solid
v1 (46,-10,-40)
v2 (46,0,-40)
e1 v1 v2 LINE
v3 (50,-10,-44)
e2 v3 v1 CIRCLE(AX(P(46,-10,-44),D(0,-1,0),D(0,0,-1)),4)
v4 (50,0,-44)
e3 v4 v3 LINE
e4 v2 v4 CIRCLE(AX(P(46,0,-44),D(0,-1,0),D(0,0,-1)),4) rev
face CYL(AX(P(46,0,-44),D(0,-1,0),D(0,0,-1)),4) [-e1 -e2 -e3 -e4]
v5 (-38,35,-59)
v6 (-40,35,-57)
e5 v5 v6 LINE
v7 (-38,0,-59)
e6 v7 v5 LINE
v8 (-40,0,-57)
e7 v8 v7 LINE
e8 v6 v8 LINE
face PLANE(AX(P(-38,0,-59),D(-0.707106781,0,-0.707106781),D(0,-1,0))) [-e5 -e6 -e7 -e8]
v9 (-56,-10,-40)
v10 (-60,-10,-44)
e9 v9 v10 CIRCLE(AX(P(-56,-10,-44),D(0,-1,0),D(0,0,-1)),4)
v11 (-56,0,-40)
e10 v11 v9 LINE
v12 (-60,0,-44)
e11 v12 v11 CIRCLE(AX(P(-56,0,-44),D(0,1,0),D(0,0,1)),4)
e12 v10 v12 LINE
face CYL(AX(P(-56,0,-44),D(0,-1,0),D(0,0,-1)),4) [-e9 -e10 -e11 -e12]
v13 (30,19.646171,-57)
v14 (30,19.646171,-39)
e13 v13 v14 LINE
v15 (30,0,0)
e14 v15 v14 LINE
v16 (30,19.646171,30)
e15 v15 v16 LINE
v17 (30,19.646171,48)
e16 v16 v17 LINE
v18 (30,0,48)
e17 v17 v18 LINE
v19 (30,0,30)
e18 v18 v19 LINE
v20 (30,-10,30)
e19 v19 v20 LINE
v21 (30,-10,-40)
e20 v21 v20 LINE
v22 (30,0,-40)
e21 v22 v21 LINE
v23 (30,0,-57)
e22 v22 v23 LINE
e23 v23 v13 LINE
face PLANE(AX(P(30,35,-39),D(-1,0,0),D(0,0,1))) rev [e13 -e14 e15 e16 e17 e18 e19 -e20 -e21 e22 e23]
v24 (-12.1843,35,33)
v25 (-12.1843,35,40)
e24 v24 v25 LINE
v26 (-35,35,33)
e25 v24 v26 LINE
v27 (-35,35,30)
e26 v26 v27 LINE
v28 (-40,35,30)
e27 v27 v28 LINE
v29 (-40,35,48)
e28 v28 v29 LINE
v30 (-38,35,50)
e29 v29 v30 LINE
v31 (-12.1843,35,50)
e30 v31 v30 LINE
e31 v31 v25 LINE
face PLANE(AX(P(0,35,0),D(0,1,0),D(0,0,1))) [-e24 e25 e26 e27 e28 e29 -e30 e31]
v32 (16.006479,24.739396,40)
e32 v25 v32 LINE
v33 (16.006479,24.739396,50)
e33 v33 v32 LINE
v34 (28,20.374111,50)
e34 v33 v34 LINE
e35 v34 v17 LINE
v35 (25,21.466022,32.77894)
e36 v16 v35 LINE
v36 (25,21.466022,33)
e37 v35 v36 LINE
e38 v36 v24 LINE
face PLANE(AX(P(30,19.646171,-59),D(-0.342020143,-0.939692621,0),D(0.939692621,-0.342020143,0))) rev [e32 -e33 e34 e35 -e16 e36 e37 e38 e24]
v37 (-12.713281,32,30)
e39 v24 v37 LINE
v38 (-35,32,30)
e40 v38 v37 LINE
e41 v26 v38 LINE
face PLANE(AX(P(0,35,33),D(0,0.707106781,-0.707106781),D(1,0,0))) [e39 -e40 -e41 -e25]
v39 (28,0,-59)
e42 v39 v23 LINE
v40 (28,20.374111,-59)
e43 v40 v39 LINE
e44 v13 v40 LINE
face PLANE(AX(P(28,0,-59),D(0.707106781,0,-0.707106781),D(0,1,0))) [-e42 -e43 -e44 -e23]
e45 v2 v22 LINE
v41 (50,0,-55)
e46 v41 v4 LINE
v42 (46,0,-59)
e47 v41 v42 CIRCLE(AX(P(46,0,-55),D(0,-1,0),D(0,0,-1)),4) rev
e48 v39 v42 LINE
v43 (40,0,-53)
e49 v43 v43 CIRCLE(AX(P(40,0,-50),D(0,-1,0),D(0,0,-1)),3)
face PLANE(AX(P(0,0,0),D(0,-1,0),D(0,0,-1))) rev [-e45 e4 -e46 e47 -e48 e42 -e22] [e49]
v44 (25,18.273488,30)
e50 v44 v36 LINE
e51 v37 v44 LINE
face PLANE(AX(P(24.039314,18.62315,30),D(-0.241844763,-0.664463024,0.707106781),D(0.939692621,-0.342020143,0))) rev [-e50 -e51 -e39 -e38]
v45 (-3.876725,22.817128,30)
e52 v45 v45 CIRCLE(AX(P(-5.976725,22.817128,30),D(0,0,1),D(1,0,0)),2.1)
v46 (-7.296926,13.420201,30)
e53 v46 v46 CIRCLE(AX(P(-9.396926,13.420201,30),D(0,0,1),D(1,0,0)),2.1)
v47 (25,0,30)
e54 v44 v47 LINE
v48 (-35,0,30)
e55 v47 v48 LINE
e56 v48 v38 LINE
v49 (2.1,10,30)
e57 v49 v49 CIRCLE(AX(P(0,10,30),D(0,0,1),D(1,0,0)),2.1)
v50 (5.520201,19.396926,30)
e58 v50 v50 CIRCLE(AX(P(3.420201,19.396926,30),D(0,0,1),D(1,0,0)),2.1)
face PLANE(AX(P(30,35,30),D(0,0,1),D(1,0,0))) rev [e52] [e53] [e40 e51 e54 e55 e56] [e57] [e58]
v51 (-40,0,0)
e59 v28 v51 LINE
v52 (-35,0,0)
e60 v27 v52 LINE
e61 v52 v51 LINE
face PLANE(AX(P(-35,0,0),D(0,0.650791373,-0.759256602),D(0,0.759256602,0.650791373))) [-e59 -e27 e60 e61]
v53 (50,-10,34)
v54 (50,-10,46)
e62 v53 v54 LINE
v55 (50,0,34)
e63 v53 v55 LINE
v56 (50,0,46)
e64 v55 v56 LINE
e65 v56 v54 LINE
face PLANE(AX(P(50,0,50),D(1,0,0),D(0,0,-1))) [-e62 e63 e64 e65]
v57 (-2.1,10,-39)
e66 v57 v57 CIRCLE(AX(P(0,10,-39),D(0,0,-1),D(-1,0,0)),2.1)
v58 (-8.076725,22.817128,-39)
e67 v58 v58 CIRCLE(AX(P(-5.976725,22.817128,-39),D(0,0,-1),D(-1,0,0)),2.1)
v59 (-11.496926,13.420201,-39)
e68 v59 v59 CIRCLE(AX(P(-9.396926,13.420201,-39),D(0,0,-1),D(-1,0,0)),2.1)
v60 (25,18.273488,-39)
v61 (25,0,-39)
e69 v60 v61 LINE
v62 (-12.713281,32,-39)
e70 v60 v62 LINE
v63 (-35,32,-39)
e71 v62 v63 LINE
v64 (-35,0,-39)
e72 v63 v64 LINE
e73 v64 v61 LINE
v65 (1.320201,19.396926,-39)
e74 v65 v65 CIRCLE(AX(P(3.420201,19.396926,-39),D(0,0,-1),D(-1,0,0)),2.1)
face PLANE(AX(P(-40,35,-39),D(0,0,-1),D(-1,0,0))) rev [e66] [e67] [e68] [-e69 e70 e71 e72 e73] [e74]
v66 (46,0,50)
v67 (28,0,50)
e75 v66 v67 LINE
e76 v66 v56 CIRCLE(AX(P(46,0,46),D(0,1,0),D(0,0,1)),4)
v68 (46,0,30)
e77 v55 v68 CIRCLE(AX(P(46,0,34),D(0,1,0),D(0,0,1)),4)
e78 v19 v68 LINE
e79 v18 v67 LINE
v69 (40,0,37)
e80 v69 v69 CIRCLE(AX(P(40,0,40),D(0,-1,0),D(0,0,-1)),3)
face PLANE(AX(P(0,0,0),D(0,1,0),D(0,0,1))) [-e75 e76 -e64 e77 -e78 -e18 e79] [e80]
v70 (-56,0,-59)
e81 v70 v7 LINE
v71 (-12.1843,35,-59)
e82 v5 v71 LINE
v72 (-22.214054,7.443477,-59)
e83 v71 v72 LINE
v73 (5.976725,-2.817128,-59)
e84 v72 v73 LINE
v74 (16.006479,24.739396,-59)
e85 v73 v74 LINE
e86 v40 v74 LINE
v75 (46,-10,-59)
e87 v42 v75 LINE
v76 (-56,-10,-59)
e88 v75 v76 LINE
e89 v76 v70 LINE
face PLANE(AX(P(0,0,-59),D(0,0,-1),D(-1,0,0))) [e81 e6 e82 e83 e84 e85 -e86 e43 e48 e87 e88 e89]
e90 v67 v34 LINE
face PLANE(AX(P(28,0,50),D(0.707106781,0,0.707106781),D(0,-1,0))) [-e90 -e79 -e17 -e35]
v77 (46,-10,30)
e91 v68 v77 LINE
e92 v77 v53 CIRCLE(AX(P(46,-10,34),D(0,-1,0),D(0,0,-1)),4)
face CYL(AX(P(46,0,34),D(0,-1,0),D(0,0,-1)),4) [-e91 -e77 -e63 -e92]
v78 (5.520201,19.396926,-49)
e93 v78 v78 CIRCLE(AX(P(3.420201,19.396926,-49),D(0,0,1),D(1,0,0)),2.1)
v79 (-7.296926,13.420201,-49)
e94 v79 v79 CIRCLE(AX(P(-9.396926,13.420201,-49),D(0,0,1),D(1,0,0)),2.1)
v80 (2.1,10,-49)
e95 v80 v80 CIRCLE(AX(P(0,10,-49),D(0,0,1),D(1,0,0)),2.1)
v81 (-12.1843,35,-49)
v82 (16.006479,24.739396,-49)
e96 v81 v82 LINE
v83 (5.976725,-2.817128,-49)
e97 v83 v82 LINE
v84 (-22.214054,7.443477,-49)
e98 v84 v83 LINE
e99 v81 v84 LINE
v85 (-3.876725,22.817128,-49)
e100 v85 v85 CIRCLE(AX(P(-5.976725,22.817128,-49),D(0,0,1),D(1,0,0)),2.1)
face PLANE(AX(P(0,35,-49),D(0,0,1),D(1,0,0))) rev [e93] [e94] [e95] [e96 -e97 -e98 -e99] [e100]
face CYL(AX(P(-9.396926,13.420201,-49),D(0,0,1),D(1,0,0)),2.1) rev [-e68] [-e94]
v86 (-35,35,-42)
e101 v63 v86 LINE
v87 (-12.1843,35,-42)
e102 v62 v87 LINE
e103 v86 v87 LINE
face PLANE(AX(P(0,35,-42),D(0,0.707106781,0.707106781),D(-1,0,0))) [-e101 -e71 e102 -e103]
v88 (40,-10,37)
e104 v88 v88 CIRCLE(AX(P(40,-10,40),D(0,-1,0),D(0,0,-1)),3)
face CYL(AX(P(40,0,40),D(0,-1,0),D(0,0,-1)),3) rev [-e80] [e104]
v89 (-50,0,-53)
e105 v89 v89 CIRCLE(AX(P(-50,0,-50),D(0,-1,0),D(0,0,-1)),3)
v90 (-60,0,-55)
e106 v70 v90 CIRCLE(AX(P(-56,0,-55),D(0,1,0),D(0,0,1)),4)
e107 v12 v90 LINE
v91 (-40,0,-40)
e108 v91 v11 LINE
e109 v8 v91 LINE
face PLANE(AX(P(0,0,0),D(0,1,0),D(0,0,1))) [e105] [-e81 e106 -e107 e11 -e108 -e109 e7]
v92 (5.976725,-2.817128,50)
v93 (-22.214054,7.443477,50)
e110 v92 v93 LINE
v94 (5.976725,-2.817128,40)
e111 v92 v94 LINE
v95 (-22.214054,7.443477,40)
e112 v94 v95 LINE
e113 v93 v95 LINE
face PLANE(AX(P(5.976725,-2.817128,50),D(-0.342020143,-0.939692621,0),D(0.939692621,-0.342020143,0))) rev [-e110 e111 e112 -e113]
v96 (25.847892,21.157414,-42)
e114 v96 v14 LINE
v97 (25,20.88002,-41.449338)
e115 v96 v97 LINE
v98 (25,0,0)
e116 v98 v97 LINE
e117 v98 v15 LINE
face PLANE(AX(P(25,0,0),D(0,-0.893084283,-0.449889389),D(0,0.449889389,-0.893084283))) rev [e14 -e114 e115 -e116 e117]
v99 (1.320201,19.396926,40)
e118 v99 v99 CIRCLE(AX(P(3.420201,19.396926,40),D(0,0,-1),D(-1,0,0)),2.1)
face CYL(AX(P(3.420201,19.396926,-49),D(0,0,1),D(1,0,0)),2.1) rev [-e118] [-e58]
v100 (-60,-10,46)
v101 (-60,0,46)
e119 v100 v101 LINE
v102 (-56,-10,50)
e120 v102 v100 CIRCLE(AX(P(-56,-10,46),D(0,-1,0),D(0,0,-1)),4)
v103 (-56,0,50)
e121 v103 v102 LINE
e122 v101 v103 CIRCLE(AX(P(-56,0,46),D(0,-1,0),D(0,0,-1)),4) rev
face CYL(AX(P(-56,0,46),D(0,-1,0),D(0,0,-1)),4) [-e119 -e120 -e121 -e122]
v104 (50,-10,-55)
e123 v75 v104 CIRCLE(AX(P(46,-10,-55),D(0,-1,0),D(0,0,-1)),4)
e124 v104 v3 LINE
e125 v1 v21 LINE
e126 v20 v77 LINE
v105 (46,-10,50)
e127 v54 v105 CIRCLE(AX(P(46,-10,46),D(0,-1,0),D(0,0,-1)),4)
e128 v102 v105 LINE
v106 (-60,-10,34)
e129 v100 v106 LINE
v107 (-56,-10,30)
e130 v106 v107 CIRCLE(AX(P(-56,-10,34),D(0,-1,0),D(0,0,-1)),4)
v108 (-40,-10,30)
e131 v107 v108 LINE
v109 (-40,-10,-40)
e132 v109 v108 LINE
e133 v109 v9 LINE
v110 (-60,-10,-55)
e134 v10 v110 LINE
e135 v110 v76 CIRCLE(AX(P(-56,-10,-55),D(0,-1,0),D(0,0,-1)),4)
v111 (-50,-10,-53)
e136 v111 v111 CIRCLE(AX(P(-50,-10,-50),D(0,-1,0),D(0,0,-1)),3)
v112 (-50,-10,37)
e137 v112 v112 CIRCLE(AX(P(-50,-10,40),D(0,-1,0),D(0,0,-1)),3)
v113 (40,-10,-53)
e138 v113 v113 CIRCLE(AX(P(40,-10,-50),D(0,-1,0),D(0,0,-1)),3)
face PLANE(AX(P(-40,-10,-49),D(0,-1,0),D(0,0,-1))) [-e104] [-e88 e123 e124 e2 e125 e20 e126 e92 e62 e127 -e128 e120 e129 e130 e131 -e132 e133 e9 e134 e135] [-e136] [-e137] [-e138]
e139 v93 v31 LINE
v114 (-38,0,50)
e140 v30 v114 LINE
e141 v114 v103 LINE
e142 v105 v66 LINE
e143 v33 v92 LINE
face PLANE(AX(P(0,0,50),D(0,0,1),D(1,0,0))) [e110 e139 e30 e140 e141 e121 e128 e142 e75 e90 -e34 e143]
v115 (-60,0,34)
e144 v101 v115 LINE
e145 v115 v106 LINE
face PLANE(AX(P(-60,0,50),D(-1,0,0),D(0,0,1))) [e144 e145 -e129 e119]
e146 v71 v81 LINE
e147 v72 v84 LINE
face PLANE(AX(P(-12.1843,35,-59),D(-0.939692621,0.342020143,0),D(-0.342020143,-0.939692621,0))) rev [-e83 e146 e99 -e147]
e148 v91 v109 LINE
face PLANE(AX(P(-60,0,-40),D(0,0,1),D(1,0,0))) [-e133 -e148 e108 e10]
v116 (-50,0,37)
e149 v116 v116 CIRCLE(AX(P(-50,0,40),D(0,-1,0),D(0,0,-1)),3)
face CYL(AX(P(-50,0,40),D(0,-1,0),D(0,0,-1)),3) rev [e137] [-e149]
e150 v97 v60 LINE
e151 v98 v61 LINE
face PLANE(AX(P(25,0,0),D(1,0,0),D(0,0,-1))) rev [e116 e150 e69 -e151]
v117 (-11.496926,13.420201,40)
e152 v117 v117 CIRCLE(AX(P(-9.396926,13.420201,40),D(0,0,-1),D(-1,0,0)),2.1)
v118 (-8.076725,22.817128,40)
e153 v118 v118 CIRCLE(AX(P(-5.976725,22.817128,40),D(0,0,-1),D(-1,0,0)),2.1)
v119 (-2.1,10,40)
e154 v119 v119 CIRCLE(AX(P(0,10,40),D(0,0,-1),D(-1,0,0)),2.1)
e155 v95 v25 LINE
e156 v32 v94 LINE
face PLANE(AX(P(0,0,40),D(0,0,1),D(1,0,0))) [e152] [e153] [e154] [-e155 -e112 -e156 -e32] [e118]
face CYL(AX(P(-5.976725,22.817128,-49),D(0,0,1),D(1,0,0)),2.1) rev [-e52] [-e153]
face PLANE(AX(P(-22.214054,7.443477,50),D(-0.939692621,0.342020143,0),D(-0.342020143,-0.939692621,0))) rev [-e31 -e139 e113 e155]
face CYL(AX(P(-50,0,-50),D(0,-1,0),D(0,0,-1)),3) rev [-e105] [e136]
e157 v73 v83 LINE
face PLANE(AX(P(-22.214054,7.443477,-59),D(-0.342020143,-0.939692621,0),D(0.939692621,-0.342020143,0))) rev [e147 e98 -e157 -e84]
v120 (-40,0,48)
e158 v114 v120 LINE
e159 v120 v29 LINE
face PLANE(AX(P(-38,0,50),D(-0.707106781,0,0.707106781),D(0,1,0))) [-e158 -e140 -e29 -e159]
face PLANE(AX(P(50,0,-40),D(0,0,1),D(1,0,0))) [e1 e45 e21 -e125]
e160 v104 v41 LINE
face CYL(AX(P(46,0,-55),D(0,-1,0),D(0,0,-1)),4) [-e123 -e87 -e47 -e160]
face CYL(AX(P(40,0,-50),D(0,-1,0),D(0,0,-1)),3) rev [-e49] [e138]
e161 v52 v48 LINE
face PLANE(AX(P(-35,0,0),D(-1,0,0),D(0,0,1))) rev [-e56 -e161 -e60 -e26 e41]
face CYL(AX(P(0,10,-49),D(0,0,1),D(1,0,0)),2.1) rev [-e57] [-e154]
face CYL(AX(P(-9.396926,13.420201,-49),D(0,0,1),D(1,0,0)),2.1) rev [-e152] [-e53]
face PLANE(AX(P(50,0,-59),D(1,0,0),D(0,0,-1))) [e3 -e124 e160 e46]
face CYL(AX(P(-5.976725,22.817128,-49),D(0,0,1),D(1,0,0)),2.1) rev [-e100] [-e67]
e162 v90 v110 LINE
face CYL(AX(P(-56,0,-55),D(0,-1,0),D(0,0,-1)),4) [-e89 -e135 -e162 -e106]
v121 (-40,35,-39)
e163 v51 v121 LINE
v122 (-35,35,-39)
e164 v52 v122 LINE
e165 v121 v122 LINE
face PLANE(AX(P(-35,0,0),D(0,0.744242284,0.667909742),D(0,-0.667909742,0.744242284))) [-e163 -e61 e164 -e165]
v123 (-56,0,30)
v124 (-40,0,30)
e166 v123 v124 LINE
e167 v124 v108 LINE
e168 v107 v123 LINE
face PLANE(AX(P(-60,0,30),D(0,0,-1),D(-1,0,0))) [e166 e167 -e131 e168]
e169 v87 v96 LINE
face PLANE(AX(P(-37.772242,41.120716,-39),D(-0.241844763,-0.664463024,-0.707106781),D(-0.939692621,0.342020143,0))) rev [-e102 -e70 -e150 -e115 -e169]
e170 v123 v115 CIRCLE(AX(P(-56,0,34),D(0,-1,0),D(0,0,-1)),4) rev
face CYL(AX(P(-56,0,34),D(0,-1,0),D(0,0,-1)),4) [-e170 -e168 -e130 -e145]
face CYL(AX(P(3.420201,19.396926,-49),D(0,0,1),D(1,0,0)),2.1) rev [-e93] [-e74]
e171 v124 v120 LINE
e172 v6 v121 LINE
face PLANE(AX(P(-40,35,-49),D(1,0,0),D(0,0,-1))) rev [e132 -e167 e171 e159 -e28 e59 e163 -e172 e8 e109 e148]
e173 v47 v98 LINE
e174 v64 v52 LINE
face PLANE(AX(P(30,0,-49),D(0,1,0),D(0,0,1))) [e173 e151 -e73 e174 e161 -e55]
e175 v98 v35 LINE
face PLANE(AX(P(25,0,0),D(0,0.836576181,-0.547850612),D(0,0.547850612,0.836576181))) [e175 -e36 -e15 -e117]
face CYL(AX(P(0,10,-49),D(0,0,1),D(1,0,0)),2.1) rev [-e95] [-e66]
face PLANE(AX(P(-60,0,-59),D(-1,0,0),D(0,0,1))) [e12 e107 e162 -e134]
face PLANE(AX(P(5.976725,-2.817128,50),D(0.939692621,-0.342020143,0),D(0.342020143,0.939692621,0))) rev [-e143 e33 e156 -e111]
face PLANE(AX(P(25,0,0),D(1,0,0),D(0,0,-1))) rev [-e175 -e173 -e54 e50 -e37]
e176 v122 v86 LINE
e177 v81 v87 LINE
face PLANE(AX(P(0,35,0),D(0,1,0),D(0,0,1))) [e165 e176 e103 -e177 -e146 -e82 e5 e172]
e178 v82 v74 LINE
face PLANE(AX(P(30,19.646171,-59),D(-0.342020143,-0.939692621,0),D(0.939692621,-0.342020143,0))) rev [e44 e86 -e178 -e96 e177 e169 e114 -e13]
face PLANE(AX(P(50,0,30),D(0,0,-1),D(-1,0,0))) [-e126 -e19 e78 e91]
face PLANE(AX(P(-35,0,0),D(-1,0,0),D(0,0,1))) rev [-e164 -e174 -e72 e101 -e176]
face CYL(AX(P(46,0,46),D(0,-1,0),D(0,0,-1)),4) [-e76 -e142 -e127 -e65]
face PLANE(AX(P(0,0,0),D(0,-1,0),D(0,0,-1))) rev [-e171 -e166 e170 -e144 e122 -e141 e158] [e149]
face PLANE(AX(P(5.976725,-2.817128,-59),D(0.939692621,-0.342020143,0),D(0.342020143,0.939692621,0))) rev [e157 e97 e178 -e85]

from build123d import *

# Parameters (mm, degrees)
EXTRUDE_1_DEPTH          = 35
EXTRUDE_1_2_DEPTH        = 35
CUT_EXTRUDE_1_DEPTH      = 104.662915259
CUT_EXTRUDE_1_DEPTH_BACK = 104.662915259
SKETCH_2_R               = 2.1
SKETCH_3_W               = 70
SKETCH_3_H               = 10
EXTRUDE_2_DEPTH          = 89
EXTRUDE_3_DEPTH          = 10
EXTRUDE_4_DEPTH          = 10
SKETCH_8_W               = 20
SKETCH_8_H               = 19
SKETCH_8_R               = 3
SKETCH_8_H_2             = 20
EXTRUDE_9_DEPTH          = 10
EXTRUDE_10_DEPTH         = 5
CUT_EXTRUDE_2_DEPTH      = 130.251692445
CUT_EXTRUDE_2_DEPTH_BACK = 130.251692445
EXTRUDE_12_DEPTH         = 5
FILLET_1_R               = 4
FILLET_2_R               = 4
CHAMFER_3_SIZE           = 3
CHAMFER_4_SIZE           = 2


with BuildPart() as part:
    # Эскиз1 → Бобышка-Вытянуть1 (new body)
    with BuildSketch(Plane(origin=(0, 0, 0), x_dir=(1, 0, 0), z_dir=(0, 1, 0))):
        Polygon((0, -40), (30, -40), (30, -30), (-40, -30), (-40, -40), align=None)
    extrude(amount=EXTRUDE_1_DEPTH)


with BuildPart() as body_2:
    # Эскиз1 → Extrude 1 2 (new body)
    with BuildSketch(Plane(origin=(0, 0, 0), x_dir=(1, 0, 0), z_dir=(0, 1, 0))):
        Polygon((0, 49), (30, 49), (30, 39), (-40, 39), (-40, 49), align=None)
    extrude(amount=EXTRUDE_1_2_DEPTH)


with BuildPart() as cut_extrude_1_tool:
    # Эскиз2 → Вырез-Вытянуть1 (new, two sides: drawn at the far end of the back side and taken through both)
    with BuildSketch(Plane.XY.offset(40).offset(-CUT_EXTRUDE_1_DEPTH_BACK)):
        with Locations((0, 10)):
            Circle(SKETCH_2_R)
        with Locations((-9.396926208, 13.420201433)):
            Circle(SKETCH_2_R)
        with Locations((3.420201433, 19.396926208)):
            Circle(SKETCH_2_R)
        with Locations((-5.976724775, 22.817127641)):
            Circle(SKETCH_2_R)
    extrude(amount=CUT_EXTRUDE_1_DEPTH + CUT_EXTRUDE_1_DEPTH_BACK)


with BuildPart() as part_1:
    add(part.part)

    # Вырез-Вытянуть1: cut by cut_extrude_1_tool
    add(cut_extrude_1_tool.part, mode=Mode.SUBTRACT)



with BuildPart() as body_2_1:
    add(body_2.part)

    # Вырез-Вытянуть1: cut by cut_extrude_1_tool
    add(cut_extrude_1_tool.part, mode=Mode.SUBTRACT)


with BuildPart() as part_2:
    add(part_1.part)

    add(body_2_1.part)  # Бобышка-Вытянуть2 merges body 2
    # Эскиз3 → Бобышка-Вытянуть2 (add)
    with BuildSketch(Plane.XY.offset(40)):
        with Locations((-5, -5)):
            Rectangle(SKETCH_3_W, SKETCH_3_H)
    extrude(amount=-EXTRUDE_2_DEPTH)

    # Эскиз4 → Бобышка-Вытянуть3 (add)
    with BuildSketch(Plane.XY.offset(40)):
        Polygon((5.976724775, -2.817127641), (-22.214053849, 7.443476659), (-12.184299593, 35), (-40, 35), (-40, -10), (30, -10), (30, 35), (19.741033581, 35), align=None)
    extrude(amount=EXTRUDE_3_DEPTH)

    # Эскиз5 → Бобышка-Вытянуть4 (add)
    with BuildSketch(Plane(origin=(0, 0, -49), x_dir=(-1, 0, 0), z_dir=(0, 0, -1))):
        Polygon((-30, 35), (-30, -10), (40, -10), (40, 35), (12.184299593, 35), (22.214053849, 7.443476659), (-5.976724775, -2.817127641), (-19.741033581, 35), align=None)
    extrude(amount=EXTRUDE_4_DEPTH)

    # Эскиз8 → Бобышка-Вытянуть9 (add)
    # profile 1 of 4: a face of its own
    with BuildSketch(Plane(origin=(0, -10, 0), x_dir=(-1, 0, 0), z_dir=(0, -1, 0))):
        with Locations((-40, 49.5)):
            Rectangle(SKETCH_8_W, SKETCH_8_H)
        with Locations(Location((-40, 50, 0), (0, 0, 90))):
            Circle(SKETCH_8_R, mode=Mode.SUBTRACT)
    # profile 2 of 4: a face of its own
    with BuildSketch(Plane(origin=(0, -10, 0), x_dir=(-1, 0, 0), z_dir=(0, -1, 0))):
        with Locations((-40, -40)):
            Rectangle(SKETCH_8_W, SKETCH_8_H_2)
        with Locations(Location((-40, -40, 0), (0, 0, 90))):
            Circle(SKETCH_8_R, mode=Mode.SUBTRACT)
    # profile 3 of 4: a face of its own
    with BuildSketch(Plane(origin=(0, -10, 0), x_dir=(-1, 0, 0), z_dir=(0, -1, 0))):
        with Locations((50, 49.5)):
            Rectangle(SKETCH_8_W, SKETCH_8_H)
        with Locations(Location((50, 50, 0), (0, 0, 90))):
            Circle(SKETCH_8_R, mode=Mode.SUBTRACT)
    # profile 4 of 4: a face of its own
    with BuildSketch(Plane(origin=(0, -10, 0), x_dir=(-1, 0, 0), z_dir=(0, -1, 0))):
        with Locations((50, -40)):
            Rectangle(SKETCH_8_W, SKETCH_8_H_2)
        with Locations(Location((50, -40, 0), (0, 0, 90))):
            Circle(SKETCH_8_R, mode=Mode.SUBTRACT)
    extrude(amount=-EXTRUDE_9_DEPTH)

    # Эскиз6 → Бобышка-Вытянуть10 (add)
    with BuildSketch(Plane.ZY.offset(40)):
        Polygon((-39, 0), (0, 0), (-39, 35), align=None)
        Polygon((30, 0), (30, 35), (0, 0), align=None)
    extrude(amount=-EXTRUDE_10_DEPTH)

    # Эскиз10 → Вырез-Вытянуть2 (cut, two sides: drawn at the far end of the back side and taken through both)
    with BuildSketch(Plane.XY.offset(50).offset(-CUT_EXTRUDE_2_DEPTH_BACK)):
        Polygon((30, 19.646170595), (-12.184299593, 35), (30, 35), align=None)
    extrude(amount=CUT_EXTRUDE_2_DEPTH + CUT_EXTRUDE_2_DEPTH_BACK, mode=Mode.SUBTRACT)

    # Эскиз9 → Бобышка-Вытянуть12 (add)
    with BuildSketch(Plane(origin=(30, 0, 0), x_dir=(0, 0, -1), z_dir=(1, 0, 0))):
        Polygon((39, 19.646170595), (39, 0), (0, 0), align=None)
        Polygon((0, 0), (-30, 19.646170595), (-30, 0), align=None)
    extrude(amount=-EXTRUDE_12_DEPTH)

    # Скругление1
    fillet_1_edges = [part_2.edges().sort_by_distance(p)[0] for p in [
        (50, -5, -59),
        (50, -5, 50),
        (-60, -5, -59),
        (-60, -5, 50),
    ]]
    fillet(fillet_1_edges, radius=FILLET_1_R)

    # Скругление2
    fillet_2_edges = [part_2.edges().sort_by_distance(p)[0] for p in [
        (50, -5, -40),
        (50, -5, 30),
        (-60, -5, -40),
        (-60, -5, 30),
    ]]
    fillet(fillet_2_edges, radius=FILLET_2_R)

    # Фаска3
    # the kernel refuses this chamfer: 3 mm, written as the material it takes off along each edge
    with BuildSketch(Plane(origin=(-4.469250629, 35, -39), x_dir=(0, 0.027495876610586768, -0.9996219169112968), z_dir=(-1, 0, 0))) as chamfer_3_piece_1:
        Polygon((CHAMFER_3_SIZE * 0.999621916911, CHAMFER_3_SIZE * 0.0274958766106), (-CHAMFER_3_SIZE * 0.0274958766106, CHAMFER_3_SIZE * 0.999621916911), (0, 0), align=None)
    extrude(amount=30.530749371, mode=Mode.SUBTRACT)
    with BuildSketch(Plane(origin=(-19.434074173, 37.638702152, -39), x_dir=(0.009404143659217951, 0.02583767235300856, -0.9996219169112968), z_dir=(0.9396926207859079, -0.34202014332567027, 0))) as chamfer_3_piece_2_section:
        Polygon((CHAMFER_3_SIZE * 0.999621916911, -CHAMFER_3_SIZE * 0.0274958766106), (-CHAMFER_3_SIZE * 0.0274958766106, -CHAMFER_3_SIZE * 0.999621916911), (0, 0), align=None)
    chamfer_3_piece_2 = extrude(amount=60.321691902, mode=Mode.PRIVATE)
    chamfer_3_piece_2 = split(chamfer_3_piece_2, bisect_by=Plane(origin=(25, 27.771188546, -39.985901666), z_dir=(-1, 0, 0)), keep=Keep.TOP, mode=Mode.PRIVATE)
    add(chamfer_3_piece_2, mode=Mode.SUBTRACT)
    with BuildSketch(Plane(origin=(-19.434074173, 37.638702152, -39), x_dir=(0.009404143659217951, 0.02583767235300856, -0.9996219169112968), z_dir=(0.9396926207859079, -0.34202014332567027, 0))) as chamfer_3_piece_3_section:
        Polygon((CHAMFER_3_SIZE * 0.999621916911, -CHAMFER_3_SIZE * 0.0274958766106), (-CHAMFER_3_SIZE * 0.0274958766106, -CHAMFER_3_SIZE * 0.999621916911), (0, 0), align=None)
    chamfer_3_piece_3 = extrude(amount=60.321691902, mode=Mode.PRIVATE)
    chamfer_3_piece_3 = split(chamfer_3_piece_3, bisect_by=Plane(origin=(26.25970181, 20.183987428, -40.067630782), z_dir=(0, 0.8930842834154016, 0.4498893894241103)), keep=Keep.TOP, mode=Mode.PRIVATE)
    add(chamfer_3_piece_3, mode=Mode.SUBTRACT)
    with BuildSketch(Plane(origin=(-4.469250629, 35, 30), x_dir=(0, 0.027495876610586768, 0.9996219169112968), z_dir=(-1, 0, 0))) as chamfer_3_piece_4:
        Polygon((CHAMFER_3_SIZE * 0.999621916911, -CHAMFER_3_SIZE * 0.0274958766106), (-CHAMFER_3_SIZE * 0.0274958766106, -CHAMFER_3_SIZE * 0.999621916911), (0, 0), align=None)
    extrude(amount=30.530749371, mode=Mode.SUBTRACT)
    with BuildSketch(Plane(origin=(-19.434074173, 37.638702152, 30), x_dir=(0.009404143659217682, 0.025837672353007816, 0.9996219169112968), z_dir=(0.9396926207859079, -0.34202014332567027, 0))) as chamfer_3_piece_5_section:
        Polygon((CHAMFER_3_SIZE * 0.999621916911, CHAMFER_3_SIZE * 0.0274958766106), (-CHAMFER_3_SIZE * 0.0274958766106, CHAMFER_3_SIZE * 0.999621916911), (0, 0), align=None)
    chamfer_3_piece_5 = extrude(amount=60.321691902, mode=Mode.PRIVATE)
    chamfer_3_piece_5 = split(chamfer_3_piece_5, bisect_by=Plane(origin=(25, 27.800984408, 30.984043991), z_dir=(-1, 0, 0)), keep=Keep.TOP, mode=Mode.PRIVATE)
    add(chamfer_3_piece_5, mode=Mode.SUBTRACT)
    with BuildSketch(Plane(origin=(-19.434074173, 37.638702152, 30), x_dir=(0.009404143659217682, 0.025837672353007816, 0.9996219169112968), z_dir=(0.9396926207859079, -0.34202014332567027, 0))) as chamfer_3_piece_6_section:
        Polygon((CHAMFER_3_SIZE * 0.999621916911, CHAMFER_3_SIZE * 0.0274958766106), (-CHAMFER_3_SIZE * 0.0274958766106, CHAMFER_3_SIZE * 0.999621916911), (0, 0), align=None)
    chamfer_3_piece_6 = extrude(amount=60.321691902, mode=Mode.PRIVATE)
    chamfer_3_piece_6 = split(chamfer_3_piece_6, bisect_by=Plane(origin=(26.25, 20.237686054, 30.903253063), z_dir=(0, 0.8365761810170901, -0.547850612261099)), keep=Keep.TOP, mode=Mode.PRIVATE)
    add(chamfer_3_piece_6, mode=Mode.SUBTRACT)

    # Фаска4
    chamfer_4_edges = [part_2.edges().sort_by_distance(p)[0] for p in [
        (30, 9.823085297, 50),
        (-40, 17.5, -59),
        (30, 9.823085297, -59),
        (-40, 17.5, 50),
    ]]
    chamfer(chamfer_4_edges, length=CHAMFER_4_SIZE)


solid = part_2.part
